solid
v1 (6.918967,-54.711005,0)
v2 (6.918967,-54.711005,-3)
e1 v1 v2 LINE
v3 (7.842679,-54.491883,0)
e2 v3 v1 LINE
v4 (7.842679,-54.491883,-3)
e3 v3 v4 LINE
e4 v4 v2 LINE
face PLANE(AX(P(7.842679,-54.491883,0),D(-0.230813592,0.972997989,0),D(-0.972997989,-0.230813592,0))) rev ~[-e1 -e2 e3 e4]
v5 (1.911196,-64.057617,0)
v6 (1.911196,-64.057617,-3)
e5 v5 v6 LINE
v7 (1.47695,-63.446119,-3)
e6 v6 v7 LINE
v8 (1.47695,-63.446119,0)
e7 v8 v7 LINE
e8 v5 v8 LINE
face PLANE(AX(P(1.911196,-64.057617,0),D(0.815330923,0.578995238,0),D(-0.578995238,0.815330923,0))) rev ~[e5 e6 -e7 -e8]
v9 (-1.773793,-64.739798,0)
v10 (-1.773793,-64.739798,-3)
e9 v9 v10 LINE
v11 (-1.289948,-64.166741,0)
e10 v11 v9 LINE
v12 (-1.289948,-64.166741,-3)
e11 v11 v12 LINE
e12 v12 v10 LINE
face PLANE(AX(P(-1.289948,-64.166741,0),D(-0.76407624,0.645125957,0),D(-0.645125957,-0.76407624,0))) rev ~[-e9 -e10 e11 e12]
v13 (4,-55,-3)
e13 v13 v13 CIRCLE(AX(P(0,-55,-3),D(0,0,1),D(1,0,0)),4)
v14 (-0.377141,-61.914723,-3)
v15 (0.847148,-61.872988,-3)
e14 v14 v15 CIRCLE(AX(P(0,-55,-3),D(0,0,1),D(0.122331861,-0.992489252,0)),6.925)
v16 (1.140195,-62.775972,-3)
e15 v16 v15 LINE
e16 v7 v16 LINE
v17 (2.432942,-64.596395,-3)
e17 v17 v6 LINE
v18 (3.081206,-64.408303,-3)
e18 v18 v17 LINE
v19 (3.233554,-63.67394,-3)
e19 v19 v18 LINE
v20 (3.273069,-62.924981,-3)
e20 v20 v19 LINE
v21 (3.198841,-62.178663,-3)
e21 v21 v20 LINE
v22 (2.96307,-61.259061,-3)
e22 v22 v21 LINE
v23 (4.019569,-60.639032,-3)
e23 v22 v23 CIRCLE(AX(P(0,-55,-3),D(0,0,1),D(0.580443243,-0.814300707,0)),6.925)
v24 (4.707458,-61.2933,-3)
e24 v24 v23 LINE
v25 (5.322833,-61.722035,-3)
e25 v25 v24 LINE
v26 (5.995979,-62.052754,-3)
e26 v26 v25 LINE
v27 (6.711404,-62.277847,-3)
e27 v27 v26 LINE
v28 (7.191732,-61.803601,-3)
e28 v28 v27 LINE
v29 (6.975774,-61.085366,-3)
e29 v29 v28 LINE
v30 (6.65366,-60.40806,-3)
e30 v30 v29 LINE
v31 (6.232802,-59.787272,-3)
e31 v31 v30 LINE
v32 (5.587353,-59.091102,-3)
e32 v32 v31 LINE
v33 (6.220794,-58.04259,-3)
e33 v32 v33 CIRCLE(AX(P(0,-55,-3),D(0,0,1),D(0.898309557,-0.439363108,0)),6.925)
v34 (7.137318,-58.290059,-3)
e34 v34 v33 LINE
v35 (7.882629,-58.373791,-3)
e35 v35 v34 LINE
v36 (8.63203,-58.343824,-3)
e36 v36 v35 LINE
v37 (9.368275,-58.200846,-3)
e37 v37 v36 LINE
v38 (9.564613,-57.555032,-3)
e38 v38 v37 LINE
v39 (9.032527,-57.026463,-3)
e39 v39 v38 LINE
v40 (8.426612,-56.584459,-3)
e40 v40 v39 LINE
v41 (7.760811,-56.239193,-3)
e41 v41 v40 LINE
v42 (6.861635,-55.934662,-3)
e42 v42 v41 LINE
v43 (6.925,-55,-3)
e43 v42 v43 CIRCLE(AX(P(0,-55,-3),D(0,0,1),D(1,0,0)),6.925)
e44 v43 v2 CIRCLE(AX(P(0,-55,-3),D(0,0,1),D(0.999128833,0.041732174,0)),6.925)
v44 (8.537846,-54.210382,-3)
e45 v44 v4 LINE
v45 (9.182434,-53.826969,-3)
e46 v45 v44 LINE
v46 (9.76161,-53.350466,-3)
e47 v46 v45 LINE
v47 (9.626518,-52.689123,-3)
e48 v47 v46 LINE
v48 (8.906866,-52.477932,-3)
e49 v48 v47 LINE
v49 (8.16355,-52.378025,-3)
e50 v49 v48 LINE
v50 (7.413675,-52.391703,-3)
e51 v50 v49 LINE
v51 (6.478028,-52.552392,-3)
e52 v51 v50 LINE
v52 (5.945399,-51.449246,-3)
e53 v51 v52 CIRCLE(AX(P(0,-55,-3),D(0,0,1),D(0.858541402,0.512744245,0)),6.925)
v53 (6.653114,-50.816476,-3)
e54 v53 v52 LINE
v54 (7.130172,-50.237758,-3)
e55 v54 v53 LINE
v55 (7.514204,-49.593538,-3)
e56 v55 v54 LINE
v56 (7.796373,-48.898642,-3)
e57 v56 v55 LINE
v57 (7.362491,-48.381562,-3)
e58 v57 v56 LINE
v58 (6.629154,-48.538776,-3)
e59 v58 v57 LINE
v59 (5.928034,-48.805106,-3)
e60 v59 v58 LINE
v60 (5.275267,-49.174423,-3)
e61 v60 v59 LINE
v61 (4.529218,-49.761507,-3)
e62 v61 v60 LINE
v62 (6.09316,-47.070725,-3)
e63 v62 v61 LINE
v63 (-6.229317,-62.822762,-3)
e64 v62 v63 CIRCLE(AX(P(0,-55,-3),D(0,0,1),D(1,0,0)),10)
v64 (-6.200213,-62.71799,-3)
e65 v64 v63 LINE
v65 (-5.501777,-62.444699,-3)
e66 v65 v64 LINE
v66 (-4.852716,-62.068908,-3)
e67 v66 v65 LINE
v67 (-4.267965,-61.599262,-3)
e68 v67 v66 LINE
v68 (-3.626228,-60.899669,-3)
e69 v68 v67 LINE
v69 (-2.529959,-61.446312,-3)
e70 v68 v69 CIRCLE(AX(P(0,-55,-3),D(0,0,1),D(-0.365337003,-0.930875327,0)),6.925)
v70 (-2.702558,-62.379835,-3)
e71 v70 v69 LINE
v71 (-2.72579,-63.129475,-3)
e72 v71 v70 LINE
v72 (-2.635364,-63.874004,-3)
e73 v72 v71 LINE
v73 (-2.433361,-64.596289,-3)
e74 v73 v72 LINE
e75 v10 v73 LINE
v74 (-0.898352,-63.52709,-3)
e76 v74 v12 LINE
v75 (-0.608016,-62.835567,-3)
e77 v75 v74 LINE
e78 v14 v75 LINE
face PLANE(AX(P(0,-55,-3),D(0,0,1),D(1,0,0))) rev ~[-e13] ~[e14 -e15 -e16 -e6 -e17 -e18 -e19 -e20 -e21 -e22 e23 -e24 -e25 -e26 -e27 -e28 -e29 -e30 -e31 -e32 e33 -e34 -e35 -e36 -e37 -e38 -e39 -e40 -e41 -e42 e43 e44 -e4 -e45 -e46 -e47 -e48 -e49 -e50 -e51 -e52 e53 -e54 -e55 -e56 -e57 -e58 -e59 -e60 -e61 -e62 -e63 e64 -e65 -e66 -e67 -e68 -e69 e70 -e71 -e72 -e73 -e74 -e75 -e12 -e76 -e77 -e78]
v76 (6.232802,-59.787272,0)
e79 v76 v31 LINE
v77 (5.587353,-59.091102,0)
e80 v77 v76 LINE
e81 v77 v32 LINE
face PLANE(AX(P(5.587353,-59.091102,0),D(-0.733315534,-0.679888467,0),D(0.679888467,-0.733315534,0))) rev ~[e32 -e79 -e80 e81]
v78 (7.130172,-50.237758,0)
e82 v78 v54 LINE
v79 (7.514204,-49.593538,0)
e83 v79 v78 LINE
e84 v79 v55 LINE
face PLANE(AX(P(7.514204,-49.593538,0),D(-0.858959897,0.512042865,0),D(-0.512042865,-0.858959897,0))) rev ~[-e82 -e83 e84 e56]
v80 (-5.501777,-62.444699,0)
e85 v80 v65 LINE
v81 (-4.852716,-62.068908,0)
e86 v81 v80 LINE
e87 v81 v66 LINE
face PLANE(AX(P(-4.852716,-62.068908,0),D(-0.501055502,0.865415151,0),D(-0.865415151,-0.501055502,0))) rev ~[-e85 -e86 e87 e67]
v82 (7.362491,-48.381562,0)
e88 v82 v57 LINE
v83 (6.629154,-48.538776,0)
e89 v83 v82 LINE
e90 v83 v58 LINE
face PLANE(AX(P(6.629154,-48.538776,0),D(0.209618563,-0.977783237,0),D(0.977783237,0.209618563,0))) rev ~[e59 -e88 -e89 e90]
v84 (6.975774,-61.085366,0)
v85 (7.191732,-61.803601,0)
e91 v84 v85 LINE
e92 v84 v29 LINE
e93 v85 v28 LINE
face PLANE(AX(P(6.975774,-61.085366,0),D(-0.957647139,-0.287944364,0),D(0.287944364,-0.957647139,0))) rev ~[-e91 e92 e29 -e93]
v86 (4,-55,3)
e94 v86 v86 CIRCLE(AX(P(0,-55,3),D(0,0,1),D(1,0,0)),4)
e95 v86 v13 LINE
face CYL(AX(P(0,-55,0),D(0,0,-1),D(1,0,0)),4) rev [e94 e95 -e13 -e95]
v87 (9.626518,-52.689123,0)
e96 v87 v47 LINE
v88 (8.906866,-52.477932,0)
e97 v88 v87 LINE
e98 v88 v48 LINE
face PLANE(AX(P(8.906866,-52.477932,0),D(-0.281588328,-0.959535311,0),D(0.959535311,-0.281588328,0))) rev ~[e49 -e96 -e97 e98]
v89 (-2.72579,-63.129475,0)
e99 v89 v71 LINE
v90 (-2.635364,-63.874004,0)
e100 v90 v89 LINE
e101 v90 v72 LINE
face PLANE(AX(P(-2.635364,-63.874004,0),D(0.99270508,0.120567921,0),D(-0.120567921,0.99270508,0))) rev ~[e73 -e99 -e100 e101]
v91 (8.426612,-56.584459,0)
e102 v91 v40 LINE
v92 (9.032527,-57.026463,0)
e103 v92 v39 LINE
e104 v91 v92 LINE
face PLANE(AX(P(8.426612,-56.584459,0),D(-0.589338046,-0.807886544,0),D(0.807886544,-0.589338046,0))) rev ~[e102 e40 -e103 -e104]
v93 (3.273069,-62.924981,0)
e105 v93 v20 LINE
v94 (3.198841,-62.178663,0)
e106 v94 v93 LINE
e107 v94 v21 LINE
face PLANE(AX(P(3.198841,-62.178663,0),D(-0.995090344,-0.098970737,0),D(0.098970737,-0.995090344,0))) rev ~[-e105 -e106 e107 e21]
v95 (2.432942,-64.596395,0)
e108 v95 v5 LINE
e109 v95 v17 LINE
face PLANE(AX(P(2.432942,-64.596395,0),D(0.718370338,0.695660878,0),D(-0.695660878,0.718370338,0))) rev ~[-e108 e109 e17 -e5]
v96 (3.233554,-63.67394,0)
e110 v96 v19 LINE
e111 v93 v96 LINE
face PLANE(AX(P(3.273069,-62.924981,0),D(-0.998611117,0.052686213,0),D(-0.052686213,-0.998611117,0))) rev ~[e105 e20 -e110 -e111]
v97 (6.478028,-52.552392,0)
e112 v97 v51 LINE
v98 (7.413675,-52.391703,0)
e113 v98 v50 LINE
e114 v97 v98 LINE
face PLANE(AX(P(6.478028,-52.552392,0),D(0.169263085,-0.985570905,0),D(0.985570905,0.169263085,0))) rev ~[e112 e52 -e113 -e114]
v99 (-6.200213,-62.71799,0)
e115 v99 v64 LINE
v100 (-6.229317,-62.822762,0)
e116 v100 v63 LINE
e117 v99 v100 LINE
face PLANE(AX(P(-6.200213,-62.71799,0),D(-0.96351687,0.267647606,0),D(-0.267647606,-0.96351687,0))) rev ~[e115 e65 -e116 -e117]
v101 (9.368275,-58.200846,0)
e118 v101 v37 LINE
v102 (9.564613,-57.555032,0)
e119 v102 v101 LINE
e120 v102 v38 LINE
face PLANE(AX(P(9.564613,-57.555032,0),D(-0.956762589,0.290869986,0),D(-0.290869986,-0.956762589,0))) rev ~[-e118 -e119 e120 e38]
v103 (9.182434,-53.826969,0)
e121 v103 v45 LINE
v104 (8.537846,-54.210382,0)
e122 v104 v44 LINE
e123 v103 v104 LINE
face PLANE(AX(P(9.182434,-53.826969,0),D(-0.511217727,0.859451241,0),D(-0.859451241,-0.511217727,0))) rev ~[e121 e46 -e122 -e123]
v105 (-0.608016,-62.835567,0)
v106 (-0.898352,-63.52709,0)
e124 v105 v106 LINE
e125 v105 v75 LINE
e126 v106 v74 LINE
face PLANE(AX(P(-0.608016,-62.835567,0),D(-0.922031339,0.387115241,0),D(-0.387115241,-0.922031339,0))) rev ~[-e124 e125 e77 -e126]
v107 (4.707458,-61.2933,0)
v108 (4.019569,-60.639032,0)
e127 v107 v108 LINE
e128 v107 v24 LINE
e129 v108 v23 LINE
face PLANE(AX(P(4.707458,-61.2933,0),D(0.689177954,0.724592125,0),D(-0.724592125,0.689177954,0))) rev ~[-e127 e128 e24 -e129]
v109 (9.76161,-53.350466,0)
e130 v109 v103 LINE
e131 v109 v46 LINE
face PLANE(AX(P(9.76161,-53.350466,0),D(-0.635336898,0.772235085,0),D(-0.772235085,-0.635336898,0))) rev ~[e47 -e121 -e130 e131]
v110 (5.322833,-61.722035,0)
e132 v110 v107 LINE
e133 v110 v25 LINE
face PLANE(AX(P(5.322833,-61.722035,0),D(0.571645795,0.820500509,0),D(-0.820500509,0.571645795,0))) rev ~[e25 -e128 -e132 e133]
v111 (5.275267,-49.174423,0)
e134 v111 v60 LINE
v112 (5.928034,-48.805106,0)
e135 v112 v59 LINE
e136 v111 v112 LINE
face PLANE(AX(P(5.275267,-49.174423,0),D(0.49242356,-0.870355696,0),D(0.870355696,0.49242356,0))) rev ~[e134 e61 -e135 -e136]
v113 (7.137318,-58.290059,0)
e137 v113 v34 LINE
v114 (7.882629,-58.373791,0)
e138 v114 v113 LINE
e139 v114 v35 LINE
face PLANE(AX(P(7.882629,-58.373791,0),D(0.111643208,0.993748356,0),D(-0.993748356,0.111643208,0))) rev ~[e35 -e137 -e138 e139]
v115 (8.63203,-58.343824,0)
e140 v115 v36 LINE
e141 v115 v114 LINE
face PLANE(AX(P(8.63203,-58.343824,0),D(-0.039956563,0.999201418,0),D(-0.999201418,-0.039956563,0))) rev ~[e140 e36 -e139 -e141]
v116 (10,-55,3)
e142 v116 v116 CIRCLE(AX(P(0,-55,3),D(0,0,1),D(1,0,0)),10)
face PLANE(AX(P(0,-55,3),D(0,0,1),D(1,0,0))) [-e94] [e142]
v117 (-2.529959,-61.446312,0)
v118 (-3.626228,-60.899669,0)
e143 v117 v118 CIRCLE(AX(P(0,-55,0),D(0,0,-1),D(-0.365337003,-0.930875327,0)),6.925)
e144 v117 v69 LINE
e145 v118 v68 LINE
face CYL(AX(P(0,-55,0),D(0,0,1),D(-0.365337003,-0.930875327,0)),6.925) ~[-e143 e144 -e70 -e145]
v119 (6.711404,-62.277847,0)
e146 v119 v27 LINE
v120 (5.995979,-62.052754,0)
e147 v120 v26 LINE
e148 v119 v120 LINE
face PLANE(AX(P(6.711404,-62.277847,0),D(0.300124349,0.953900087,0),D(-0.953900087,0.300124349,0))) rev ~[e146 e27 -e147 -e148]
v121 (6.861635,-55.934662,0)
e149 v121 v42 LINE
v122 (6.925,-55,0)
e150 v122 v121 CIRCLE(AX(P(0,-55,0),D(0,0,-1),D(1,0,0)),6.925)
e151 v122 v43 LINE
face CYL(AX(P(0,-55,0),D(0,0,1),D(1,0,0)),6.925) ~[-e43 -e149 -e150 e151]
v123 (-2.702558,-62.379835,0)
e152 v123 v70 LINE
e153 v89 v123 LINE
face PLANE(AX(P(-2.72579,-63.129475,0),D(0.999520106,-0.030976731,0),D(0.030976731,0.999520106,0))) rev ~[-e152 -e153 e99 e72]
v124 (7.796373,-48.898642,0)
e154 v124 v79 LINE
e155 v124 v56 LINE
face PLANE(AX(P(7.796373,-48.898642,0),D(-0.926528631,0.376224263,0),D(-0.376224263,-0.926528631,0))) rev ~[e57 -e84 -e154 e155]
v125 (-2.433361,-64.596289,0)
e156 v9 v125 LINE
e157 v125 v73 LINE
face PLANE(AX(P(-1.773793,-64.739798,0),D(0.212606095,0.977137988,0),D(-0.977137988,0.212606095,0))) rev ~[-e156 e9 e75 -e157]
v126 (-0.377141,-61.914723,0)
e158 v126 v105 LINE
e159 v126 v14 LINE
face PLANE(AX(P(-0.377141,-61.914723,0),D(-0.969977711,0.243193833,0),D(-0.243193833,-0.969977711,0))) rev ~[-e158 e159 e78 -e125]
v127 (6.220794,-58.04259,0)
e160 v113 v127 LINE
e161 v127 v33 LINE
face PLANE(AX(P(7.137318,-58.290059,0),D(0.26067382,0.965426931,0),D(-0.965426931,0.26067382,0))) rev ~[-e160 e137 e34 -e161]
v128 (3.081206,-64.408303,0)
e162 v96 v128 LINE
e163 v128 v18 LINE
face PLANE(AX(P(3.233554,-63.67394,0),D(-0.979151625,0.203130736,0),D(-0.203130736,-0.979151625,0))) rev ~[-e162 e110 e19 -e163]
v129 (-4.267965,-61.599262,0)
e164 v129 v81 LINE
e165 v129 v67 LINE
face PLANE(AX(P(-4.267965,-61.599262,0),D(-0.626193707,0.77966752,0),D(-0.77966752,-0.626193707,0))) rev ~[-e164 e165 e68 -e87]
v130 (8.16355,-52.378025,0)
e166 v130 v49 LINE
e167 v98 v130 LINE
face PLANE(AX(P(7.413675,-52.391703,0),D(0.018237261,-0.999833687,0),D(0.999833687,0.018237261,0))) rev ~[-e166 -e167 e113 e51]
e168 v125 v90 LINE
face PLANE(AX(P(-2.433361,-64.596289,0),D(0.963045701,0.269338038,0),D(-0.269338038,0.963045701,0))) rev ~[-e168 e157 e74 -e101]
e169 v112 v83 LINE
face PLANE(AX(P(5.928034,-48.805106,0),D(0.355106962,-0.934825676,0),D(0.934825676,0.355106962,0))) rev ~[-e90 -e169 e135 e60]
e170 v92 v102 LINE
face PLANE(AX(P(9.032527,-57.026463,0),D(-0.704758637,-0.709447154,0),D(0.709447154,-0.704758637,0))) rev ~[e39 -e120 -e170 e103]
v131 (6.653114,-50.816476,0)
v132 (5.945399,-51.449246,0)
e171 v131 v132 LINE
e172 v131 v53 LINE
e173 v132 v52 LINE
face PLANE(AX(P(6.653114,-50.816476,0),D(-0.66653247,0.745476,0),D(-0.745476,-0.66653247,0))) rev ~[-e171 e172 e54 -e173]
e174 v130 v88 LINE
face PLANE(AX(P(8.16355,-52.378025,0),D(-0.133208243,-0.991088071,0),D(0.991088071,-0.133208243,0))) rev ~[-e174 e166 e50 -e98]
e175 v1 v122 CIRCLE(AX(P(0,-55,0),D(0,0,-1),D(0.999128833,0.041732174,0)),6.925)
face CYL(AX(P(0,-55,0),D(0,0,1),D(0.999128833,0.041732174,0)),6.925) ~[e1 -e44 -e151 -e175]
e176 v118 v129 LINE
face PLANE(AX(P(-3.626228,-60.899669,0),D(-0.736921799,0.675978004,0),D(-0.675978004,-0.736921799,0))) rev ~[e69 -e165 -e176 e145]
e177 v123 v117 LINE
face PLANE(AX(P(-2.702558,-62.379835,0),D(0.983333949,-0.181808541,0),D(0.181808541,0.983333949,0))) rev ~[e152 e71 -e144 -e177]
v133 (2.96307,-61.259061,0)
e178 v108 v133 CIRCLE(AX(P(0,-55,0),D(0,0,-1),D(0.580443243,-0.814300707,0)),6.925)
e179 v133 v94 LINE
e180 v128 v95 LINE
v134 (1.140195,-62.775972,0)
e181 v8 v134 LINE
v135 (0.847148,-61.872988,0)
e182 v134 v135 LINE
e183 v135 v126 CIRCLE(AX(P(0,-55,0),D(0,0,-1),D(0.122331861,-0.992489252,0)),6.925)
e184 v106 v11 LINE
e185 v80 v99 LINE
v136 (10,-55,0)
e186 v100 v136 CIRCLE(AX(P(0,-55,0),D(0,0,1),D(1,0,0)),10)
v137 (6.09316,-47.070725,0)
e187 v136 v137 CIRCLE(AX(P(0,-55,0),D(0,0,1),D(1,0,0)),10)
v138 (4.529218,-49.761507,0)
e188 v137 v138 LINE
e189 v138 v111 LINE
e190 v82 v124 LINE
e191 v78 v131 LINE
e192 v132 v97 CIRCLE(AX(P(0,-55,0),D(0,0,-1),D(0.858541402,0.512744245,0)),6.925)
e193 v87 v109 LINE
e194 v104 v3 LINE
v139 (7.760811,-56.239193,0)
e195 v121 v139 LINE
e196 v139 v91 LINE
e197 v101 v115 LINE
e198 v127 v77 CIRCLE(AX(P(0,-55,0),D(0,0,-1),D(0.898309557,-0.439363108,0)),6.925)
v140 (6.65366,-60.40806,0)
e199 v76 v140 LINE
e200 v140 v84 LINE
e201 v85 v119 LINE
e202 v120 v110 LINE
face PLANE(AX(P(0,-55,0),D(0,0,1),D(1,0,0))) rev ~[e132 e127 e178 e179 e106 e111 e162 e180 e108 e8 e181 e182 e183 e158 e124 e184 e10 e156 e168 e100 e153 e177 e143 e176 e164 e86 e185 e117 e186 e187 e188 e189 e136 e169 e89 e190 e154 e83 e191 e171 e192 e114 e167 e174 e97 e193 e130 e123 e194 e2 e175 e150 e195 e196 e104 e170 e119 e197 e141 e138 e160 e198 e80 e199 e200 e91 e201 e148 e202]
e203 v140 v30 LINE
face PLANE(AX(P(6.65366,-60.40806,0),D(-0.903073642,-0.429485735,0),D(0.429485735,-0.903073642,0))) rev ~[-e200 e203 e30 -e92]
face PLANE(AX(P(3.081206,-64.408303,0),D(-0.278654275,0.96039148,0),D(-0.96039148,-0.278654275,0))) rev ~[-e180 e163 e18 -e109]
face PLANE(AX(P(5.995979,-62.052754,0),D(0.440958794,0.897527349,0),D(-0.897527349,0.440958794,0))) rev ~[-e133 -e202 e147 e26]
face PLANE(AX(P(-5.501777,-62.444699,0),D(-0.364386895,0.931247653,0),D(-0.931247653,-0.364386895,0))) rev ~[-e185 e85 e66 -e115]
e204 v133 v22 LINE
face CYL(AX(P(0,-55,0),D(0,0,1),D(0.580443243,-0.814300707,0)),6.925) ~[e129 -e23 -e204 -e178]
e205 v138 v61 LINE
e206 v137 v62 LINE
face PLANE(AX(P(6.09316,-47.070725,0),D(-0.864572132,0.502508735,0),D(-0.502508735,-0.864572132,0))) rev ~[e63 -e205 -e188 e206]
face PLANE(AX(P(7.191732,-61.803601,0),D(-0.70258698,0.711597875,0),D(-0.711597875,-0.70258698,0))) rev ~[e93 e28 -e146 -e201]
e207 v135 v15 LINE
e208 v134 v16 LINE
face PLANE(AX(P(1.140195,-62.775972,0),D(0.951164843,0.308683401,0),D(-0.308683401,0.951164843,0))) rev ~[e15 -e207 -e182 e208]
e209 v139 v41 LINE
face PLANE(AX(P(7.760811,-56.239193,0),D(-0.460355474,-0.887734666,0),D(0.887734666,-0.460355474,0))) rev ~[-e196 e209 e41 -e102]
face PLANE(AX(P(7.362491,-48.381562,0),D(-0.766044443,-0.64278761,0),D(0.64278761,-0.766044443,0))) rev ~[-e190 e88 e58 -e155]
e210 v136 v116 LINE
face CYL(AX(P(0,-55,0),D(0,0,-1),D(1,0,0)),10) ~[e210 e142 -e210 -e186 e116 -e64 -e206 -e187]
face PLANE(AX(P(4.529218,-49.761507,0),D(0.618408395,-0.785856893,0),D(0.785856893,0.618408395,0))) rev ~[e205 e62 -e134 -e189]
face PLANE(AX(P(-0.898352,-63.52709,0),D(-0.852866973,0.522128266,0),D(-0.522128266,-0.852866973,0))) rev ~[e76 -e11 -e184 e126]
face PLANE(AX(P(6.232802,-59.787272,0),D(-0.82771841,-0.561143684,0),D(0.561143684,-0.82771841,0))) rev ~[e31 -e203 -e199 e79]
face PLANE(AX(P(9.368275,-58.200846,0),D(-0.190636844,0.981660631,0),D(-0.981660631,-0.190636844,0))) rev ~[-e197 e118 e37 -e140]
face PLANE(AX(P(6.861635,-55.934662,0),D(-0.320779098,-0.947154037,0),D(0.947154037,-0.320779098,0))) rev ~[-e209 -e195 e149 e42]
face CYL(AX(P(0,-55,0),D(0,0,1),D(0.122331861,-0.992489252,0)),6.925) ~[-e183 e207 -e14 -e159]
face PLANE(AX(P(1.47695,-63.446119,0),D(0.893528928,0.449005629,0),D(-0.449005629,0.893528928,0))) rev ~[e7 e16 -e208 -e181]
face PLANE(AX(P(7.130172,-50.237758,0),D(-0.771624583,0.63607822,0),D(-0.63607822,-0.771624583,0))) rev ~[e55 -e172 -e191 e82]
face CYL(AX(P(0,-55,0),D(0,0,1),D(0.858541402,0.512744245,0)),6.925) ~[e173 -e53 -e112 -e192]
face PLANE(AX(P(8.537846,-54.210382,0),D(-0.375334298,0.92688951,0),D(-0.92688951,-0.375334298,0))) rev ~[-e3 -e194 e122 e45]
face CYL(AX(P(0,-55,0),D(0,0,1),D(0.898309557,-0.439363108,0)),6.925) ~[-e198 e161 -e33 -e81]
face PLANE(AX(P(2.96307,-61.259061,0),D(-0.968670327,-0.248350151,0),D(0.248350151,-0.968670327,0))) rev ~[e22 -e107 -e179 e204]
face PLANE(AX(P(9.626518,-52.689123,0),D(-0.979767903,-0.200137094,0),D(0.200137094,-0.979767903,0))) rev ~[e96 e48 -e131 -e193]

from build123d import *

# Parameters (mm, degrees)
F0_R     = 10
F0_R_2   = 4
F1_DEPTH = 3
F3_DEPTH = 25
F4_DEPTH = 3


# Not quite as in the source:
# - a feature names something its author has since deleted; it is built from what else it names


with BuildPart() as f1:
    # F0 (on Top) → F1 (new body)
    with BuildSketch(Plane.XY):
        with Locations((0, -55)):
            Circle(F0_R)
        with Locations((0, -55)):
            Circle(F0_R_2, mode=Mode.SUBTRACT)
    extrude(amount=-F1_DEPTH)

    # F2 (on face) → F3 (cut)
    with BuildSketch(Plane.XY):
        with BuildLine():
            ThreePointArc((6.918967171, -54.711004694), (6.9234916285, -54.8554708664), (6.925, -55))
            ThreePointArc((6.925, -55), (6.9091405252, -55.4684038892), (6.8616347427, -55.9346623229))
            Line((6.8616347427, -55.9346623229), (7.7608112736, -56.2391925528))
            Line((7.7608112736, -56.2391925528), (8.4266122732, -56.5844591584))
            Line((8.4266122732, -56.5844591584), (9.0325271812, -57.0264626926))
            Line((9.0325271812, -57.0264626926), (9.5646125465, -57.5550316702))
            Line((9.5646125465, -57.5550316702), (9.3682753061, -58.2008464176))
            Line((9.3682753061, -58.2008464176), (8.6320298332, -58.3438240508))
            Line((8.6320298332, -58.3438240508), (7.8826287699, -58.373791473))
            Line((7.8826287699, -58.373791473), (7.1373175032, -58.2900590671))
            Line((7.1373175032, -58.2900590671), (6.2207936805, -58.0425895196))
            ThreePointArc((6.2207936805, -58.0425895196), (5.9273034064, -58.5808796864), (5.5873528695, -59.0911016746))
            Line((5.5873528695, -59.0911016746), (6.2328020031, -59.7872715608))
            Line((6.2328020031, -59.7872715608), (6.6536597658, -60.4080603684))
            Line((6.6536597658, -60.4080603684), (6.9757740672, -61.0853656001))
            Line((6.9757740672, -61.0853656001), (7.1917323401, -61.8036009545))
            Line((7.1917323401, -61.8036009545), (6.7114037747, -62.2778471661))
            Line((6.7114037747, -62.2778471661), (5.9959787098, -62.0527539043))
            Line((5.9959787098, -62.0527539043), (5.322833198, -61.722034809))
            Line((5.322833198, -61.722034809), (4.7074578164, -61.2933004628))
            Line((4.7074578164, -61.2933004628), (4.0195694603, -60.6390323951))
            ThreePointArc((4.0195694603, -60.6390323951), (3.5050568866, -60.9724535345), (2.9630704597, -61.2590605087))
            Line((2.9630704597, -61.2590605087), (3.1988405858, -62.1786634351))
            Line((3.1988405858, -62.1786634351), (3.2730686388, -62.9249811932))
            Line((3.2730686388, -62.9249811932), (3.2335539791, -63.673939531))
            Line((3.2335539791, -63.673939531), (3.0812059272, -64.4083032495))
            Line((3.0812059272, -64.4083032495), (2.4329416781, -64.5963948851))
            Line((2.4329416781, -64.5963948851), (1.9111960197, -64.0576171313))
            Line((1.9111960197, -64.0576171313), (1.476949591, -63.4461189391))
            Line((1.476949591, -63.4461189391), (1.1401953689, -62.7759722433))
            Line((1.1401953689, -62.7759722433), (0.8471481357, -61.8729880719))
            ThreePointArc((0.8471481357, -61.8729880719), (0.2359283481, -61.9209799028), (-0.3771407279, -61.9147226894))
            Line((-0.3771407279, -61.9147226894), (-0.6080157262, -62.8355667749))
            Line((-0.6080157262, -62.8355667749), (-0.898352157, -63.5270902792))
            Line((-0.898352157, -63.5270902792), (-1.2899483564, -64.1667405091))
            Line((-1.2899483564, -64.1667405091), (-1.773792824, -64.7397976887))
            Line((-1.773792824, -64.7397976887), (-2.4333609662, -64.5962885747))
            Line((-2.4333609662, -64.5962885747), (-2.6353644947, -63.8740042993))
            Line((-2.6353644947, -63.8740042993), (-2.7257904358, -63.1294754891))
            Line((-2.7257904358, -63.1294754891), (-2.7025578872, -62.3798354097))
            Line((-2.7025578872, -62.3798354097), (-2.5299587465, -61.4463116385))
            ThreePointArc((-2.5299587465, -61.4463116385), (-3.0902045366, -61.1972785093), (-3.6262282301, -60.8996689588))
            Line((-3.6262282301, -60.8996689588), (-4.267964983, -61.5992624369))
            Line((-4.267964983, -61.5992624369), (-4.852715623, -62.0689077169))
            Line((-4.852715623, -62.0689077169), (-5.5017769863, -62.4446993436))
            Line((-5.5017769863, -62.4446993436), (-6.2002127258, -62.7179895151))
            Line((-6.2002127258, -62.7179895151), (-6.2293167628, -62.8227624704))
            ThreePointArc((-6.2293167628, -62.8227624704), (4.3420520709, -64.0081398643), (10, -55))
            ThreePointArc((10, -55), (8.9702732091, -50.5802490393), (6.093160289, -47.0707252733))
            Line((6.093160289, -47.0707252733), (4.5292177041, -49.7615067062))
            Line((4.5292177041, -49.7615067062), (5.2752674988, -49.1744234085))
            Line((5.2752674988, -49.1744234085), (5.9280342708, -48.8051057384))
            Line((5.9280342708, -48.8051057384), (6.6291535281, -48.5387755166))
            Line((6.6291535281, -48.5387755166), (7.3624909556, -48.3815615944))
            Line((7.3624909556, -48.3815615944), (7.7963725922, -48.8986415935))
            Line((7.7963725922, -48.8986415935), (7.5142043948, -49.5935380667))
            Line((7.5142043948, -49.5935380667), (7.1301722462, -50.2377579894))
            Line((7.1301722462, -50.2377579894), (6.653113581, -50.8164764269))
            Line((6.653113581, -50.8164764269), (5.9453992104, -51.4492461041))
            ThreePointArc((5.9453992104, -51.4492461041), (6.2361540084, -51.9890187341), (6.4780276654, -52.552392481))
            Line((6.4780276654, -52.552392481), (7.4136750809, -52.3917033141))
            Line((7.4136750809, -52.3917033141), (8.1635503464, -52.3780253684))
            Line((8.1635503464, -52.3780253684), (8.9068663995, -52.4779315504))
            Line((8.9068663995, -52.4779315504), (9.6265178829, -52.6891227965))
            Line((9.6265178829, -52.6891227965), (9.7616104212, -53.350466131))
            Line((9.7616104212, -53.350466131), (9.1824341074, -53.8269688042))
            Line((9.1824341074, -53.8269688042), (8.5378456767, -54.2103820995))
            Line((8.5378456767, -54.2103820995), (7.8426785438, -54.4918828231))
            Line((7.8426785438, -54.4918828231), (6.918967171, -54.711004694))
        make_face()
    extrude(amount=-F3_DEPTH, mode=Mode.SUBTRACT)

    # F0 (on Top) → F4 (join)
    with BuildSketch(Plane.XY):
        with Locations((0, -55)):
            Circle(F0_R)
        with Locations((0, -55)):
            Circle(F0_R_2, mode=Mode.SUBTRACT)
    extrude(amount=F4_DEPTH)


solid = f1.part
